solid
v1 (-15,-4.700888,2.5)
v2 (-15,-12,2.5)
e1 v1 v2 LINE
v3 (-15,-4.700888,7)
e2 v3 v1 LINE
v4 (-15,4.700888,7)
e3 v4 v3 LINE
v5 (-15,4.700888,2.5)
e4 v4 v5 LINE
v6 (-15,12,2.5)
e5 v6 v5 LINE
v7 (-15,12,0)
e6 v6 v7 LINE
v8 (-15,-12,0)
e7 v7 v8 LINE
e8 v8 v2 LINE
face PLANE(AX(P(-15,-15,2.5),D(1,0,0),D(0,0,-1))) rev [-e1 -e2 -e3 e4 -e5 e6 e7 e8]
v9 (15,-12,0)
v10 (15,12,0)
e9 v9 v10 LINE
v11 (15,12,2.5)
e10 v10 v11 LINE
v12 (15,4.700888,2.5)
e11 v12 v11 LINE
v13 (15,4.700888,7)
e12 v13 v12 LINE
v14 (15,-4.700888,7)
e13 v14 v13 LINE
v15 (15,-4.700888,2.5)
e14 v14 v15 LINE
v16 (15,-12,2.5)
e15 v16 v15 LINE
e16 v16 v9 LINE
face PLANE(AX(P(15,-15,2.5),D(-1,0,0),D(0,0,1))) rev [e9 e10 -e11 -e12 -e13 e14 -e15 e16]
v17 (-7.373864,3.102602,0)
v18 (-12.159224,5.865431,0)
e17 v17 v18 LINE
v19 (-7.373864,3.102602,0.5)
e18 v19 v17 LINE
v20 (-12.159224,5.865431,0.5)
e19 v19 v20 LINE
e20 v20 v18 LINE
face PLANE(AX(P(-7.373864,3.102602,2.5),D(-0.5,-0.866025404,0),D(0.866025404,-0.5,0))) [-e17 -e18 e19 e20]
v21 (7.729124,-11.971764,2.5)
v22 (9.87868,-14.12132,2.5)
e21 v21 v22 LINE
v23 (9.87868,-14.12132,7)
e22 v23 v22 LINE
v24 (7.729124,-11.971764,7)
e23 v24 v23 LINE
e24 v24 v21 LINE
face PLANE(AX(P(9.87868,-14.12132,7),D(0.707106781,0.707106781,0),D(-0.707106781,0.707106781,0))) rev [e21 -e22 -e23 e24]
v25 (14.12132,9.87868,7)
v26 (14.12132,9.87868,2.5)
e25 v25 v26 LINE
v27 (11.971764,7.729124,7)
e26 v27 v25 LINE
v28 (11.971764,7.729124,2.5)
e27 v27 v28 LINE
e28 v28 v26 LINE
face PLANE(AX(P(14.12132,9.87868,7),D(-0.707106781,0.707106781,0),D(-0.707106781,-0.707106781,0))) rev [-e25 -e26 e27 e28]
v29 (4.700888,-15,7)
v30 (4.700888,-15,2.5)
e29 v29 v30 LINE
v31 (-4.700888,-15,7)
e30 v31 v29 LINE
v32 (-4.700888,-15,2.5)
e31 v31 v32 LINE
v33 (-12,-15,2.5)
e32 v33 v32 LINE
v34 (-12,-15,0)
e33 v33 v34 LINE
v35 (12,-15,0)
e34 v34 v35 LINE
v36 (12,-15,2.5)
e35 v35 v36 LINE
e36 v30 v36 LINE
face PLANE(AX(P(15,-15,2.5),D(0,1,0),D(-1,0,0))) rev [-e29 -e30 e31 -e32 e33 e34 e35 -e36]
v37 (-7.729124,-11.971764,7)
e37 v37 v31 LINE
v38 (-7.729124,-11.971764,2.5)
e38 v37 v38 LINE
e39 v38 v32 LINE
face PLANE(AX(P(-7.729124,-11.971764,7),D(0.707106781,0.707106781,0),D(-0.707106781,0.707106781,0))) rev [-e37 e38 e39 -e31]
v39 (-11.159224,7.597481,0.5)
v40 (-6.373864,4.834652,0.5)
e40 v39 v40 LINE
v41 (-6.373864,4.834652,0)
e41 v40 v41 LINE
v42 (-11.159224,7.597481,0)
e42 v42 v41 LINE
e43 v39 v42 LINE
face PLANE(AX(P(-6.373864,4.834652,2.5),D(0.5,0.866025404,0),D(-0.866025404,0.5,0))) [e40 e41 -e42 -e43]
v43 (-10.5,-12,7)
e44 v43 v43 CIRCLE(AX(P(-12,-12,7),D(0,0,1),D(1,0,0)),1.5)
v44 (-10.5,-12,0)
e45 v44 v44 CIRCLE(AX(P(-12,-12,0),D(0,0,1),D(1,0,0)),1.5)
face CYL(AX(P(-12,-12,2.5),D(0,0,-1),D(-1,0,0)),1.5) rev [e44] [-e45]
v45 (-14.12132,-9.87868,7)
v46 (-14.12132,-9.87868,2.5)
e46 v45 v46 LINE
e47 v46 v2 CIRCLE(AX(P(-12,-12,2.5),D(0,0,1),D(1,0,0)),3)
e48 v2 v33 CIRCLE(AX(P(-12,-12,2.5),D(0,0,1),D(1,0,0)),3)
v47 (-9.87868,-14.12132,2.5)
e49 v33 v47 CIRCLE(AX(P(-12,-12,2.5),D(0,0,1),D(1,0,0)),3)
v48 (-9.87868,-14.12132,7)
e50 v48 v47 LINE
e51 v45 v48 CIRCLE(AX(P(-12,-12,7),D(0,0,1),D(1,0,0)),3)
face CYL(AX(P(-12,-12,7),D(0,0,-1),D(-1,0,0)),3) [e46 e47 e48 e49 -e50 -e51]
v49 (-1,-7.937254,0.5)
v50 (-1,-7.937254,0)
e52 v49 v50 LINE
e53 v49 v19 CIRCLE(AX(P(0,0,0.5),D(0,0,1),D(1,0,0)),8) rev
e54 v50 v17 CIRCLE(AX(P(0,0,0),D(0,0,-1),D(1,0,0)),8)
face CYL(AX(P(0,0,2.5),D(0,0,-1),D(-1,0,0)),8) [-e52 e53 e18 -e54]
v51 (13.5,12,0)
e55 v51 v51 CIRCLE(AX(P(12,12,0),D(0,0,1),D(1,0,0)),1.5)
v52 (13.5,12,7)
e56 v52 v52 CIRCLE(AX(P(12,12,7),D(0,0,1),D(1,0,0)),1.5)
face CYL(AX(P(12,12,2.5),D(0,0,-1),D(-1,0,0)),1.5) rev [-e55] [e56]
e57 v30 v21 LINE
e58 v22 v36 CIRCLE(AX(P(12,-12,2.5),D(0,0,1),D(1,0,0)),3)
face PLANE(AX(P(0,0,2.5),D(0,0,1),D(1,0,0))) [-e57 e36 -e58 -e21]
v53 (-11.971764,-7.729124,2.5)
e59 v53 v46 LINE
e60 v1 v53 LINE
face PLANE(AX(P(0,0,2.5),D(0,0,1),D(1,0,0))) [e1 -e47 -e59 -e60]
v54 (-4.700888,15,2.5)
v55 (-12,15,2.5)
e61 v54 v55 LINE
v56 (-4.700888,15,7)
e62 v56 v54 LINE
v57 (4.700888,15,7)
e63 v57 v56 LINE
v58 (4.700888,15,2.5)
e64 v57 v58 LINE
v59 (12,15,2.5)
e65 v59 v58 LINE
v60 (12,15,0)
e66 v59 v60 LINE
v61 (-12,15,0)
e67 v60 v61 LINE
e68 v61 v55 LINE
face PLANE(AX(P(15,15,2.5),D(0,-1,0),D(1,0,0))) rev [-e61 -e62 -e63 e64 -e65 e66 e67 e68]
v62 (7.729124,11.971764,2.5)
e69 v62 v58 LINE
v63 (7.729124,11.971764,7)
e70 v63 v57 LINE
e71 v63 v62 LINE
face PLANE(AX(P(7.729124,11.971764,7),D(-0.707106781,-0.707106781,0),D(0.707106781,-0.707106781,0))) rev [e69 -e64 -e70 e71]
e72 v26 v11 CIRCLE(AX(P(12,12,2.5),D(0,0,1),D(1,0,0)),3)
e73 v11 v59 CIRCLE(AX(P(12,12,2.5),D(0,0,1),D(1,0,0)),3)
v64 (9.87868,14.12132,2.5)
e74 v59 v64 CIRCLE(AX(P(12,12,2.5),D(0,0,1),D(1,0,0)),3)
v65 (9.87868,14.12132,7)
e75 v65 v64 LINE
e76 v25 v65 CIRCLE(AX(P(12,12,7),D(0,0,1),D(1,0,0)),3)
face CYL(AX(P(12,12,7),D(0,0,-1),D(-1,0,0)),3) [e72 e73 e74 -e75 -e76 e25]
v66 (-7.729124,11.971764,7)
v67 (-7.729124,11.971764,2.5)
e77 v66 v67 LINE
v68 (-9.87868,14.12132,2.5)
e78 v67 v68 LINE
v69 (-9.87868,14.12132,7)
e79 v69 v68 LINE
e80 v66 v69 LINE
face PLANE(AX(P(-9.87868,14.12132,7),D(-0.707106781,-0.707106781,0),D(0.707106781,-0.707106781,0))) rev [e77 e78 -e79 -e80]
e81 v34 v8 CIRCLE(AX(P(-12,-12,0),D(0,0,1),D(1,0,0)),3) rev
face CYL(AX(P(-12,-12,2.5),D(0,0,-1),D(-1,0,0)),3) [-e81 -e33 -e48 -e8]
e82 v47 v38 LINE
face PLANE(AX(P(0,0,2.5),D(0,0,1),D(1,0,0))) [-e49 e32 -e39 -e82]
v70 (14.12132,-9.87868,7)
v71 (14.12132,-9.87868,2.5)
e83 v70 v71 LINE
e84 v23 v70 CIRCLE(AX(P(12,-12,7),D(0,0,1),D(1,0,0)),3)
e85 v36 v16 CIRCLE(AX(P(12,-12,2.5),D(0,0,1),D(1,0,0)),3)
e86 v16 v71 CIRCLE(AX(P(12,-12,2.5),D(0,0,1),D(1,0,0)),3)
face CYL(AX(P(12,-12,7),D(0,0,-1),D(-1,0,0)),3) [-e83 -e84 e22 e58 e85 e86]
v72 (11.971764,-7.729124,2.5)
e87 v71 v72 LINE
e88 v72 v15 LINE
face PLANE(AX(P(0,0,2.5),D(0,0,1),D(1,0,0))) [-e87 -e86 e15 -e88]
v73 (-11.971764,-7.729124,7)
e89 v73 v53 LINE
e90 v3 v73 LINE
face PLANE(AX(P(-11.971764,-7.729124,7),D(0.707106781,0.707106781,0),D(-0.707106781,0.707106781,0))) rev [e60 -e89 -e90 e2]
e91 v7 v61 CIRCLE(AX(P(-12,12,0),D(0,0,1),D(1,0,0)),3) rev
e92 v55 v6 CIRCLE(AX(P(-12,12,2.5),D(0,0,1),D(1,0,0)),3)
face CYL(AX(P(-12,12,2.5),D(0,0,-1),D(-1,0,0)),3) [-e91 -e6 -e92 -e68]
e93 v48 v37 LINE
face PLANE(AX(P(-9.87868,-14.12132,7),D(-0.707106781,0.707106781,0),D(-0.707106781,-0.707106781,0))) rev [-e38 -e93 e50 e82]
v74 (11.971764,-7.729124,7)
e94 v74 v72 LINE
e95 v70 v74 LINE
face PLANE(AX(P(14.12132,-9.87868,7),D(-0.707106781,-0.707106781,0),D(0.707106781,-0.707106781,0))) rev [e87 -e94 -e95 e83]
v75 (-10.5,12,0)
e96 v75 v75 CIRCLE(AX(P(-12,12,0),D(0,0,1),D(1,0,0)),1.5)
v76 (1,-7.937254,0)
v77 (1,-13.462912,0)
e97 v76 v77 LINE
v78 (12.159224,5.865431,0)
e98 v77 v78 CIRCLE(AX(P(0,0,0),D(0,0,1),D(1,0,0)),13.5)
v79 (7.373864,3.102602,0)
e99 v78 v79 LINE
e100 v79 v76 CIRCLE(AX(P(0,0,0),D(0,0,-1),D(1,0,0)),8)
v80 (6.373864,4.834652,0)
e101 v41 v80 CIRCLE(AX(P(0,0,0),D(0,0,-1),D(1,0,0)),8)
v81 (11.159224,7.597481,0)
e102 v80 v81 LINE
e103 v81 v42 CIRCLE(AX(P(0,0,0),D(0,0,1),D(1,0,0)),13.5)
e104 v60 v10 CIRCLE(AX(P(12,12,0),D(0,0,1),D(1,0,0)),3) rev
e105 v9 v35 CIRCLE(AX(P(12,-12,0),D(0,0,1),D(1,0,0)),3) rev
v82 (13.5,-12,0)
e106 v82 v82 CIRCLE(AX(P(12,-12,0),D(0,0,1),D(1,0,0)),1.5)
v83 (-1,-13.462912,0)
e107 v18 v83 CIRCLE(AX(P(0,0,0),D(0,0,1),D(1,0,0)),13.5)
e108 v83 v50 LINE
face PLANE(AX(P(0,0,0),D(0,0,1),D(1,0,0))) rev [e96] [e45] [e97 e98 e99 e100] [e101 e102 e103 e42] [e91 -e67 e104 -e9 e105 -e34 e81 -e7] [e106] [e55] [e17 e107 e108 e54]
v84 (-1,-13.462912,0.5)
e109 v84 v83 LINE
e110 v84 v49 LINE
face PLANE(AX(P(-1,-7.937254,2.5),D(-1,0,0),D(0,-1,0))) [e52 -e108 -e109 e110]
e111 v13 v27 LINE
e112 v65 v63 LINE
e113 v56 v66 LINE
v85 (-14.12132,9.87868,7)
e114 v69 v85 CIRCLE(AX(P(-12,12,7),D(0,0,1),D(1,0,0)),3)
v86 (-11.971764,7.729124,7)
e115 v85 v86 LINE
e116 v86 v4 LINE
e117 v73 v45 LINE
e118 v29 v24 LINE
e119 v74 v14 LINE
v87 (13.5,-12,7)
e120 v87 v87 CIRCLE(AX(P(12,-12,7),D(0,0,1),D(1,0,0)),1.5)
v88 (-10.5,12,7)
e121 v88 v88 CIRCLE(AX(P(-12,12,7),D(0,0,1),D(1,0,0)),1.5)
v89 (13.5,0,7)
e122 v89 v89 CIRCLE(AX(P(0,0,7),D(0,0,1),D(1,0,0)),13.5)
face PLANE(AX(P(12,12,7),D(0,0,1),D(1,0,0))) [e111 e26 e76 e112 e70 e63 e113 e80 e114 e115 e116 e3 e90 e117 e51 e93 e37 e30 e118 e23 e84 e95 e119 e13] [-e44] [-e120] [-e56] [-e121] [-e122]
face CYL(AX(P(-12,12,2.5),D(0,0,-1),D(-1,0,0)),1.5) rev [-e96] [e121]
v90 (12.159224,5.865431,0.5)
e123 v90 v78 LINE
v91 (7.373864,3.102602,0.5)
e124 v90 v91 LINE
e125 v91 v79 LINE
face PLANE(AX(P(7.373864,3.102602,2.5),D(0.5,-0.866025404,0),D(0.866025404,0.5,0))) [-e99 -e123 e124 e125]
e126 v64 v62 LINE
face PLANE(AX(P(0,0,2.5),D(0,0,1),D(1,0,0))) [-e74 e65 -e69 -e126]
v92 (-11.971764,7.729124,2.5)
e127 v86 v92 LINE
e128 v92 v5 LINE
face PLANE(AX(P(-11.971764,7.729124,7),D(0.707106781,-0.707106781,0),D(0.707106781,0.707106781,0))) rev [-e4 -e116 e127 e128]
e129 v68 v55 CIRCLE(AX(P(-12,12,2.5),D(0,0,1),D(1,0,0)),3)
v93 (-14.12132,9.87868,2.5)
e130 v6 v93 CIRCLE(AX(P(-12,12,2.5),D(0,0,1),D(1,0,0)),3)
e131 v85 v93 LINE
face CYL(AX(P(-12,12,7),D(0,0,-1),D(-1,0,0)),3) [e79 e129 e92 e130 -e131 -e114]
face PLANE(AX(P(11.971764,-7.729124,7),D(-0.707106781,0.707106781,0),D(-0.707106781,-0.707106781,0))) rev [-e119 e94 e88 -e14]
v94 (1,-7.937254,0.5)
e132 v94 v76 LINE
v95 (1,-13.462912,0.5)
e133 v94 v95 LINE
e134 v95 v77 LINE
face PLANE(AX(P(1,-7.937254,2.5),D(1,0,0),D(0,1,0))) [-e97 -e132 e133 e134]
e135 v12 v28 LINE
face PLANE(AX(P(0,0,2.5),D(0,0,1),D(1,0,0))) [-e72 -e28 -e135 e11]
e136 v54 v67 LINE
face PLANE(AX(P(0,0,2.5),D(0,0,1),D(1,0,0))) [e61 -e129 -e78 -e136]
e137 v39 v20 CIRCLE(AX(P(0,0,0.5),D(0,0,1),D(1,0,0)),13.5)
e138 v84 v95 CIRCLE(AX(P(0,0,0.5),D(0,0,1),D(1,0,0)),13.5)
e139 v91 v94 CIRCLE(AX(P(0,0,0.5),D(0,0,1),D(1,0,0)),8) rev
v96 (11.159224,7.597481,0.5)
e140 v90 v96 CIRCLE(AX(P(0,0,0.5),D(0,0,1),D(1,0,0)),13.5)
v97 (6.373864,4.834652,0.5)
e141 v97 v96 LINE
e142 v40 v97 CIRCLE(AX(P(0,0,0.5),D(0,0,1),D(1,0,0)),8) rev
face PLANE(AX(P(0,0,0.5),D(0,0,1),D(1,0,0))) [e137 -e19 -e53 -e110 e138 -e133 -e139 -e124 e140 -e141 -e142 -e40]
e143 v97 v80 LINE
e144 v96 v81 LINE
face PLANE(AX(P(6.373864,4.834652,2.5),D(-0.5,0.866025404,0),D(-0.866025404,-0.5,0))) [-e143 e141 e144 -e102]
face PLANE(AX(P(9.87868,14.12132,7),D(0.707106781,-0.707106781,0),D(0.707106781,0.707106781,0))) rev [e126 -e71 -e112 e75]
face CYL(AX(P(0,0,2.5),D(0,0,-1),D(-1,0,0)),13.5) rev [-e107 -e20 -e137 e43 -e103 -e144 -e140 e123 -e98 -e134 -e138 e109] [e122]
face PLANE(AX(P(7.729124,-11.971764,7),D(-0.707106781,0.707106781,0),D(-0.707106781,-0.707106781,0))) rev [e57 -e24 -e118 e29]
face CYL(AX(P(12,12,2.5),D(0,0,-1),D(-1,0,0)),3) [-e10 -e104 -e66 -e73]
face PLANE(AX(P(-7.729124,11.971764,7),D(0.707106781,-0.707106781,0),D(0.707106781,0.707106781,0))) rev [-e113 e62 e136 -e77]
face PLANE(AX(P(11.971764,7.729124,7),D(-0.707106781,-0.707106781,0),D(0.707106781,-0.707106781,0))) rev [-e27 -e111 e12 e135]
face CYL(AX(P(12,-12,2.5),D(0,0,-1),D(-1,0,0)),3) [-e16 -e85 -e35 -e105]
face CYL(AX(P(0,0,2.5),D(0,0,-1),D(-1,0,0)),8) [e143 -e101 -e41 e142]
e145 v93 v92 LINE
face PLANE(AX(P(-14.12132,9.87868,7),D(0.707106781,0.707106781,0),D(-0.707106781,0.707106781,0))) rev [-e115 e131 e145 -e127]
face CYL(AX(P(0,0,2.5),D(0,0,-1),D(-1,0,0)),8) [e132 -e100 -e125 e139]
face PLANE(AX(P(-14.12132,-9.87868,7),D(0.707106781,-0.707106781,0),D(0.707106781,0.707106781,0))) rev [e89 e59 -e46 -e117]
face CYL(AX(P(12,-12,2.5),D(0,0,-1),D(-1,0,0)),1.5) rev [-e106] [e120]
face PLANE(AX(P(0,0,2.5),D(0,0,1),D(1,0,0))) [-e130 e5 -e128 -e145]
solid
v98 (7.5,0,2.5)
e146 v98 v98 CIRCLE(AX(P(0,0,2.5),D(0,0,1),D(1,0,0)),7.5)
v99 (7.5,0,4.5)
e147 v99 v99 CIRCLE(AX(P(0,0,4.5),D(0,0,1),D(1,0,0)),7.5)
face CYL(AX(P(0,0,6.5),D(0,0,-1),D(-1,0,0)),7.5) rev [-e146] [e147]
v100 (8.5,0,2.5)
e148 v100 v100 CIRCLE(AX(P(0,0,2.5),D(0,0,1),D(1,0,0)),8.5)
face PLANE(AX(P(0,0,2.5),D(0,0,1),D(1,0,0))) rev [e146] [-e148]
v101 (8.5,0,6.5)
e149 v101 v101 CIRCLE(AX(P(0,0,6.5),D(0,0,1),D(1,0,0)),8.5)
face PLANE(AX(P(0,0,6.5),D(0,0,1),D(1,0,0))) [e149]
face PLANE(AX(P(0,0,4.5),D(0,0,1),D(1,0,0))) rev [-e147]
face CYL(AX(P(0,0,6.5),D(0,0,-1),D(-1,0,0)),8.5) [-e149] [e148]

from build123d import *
from build123d.topology import SkipClean

# Parameters (mm, degrees)
SKETCH_1_W          = 30
SKETCH_1_H          = 30
SKETCH_1_R          = 1.5
EXTRUDE_1_DEPTH     = 2.5
SKETCH_2_R          = 1.5
SKETCH_2_R_2        = 13.5
EXTRUDE_2_DEPTH     = 4.5
FILLET_2_R          = 3
CUT_EXTRUDE_START   = -2
SKETCH_3_R          = 13.5
CUT_EXTRUDE_1_DEPTH = 2
SKETCH_4_R          = 8.5
SKETCH_4_R_2        = 7.5
EXTRUDE_3_DEPTH     = 4
SKETCH_5_R          = 8.5
EXTRUDE_4_DEPTH     = 2


with BuildPart() as part:
    # Эскиз1 → Бобышка-Вытянуть1 (new body)
    with BuildSketch(Plane.XY):
        Rectangle(SKETCH_1_W, SKETCH_1_H)
        with Locations((-12, 12)):
            Circle(SKETCH_1_R, mode=Mode.SUBTRACT)
        with Locations((12, 12)):
            Circle(SKETCH_1_R, mode=Mode.SUBTRACT)
        with Locations((12, -12)):
            Circle(SKETCH_1_R, mode=Mode.SUBTRACT)
        with Locations((-12, -12)):
            Circle(SKETCH_1_R, mode=Mode.SUBTRACT)
        with BuildLine():
            Line((-1, -7.937253933), (-1, -13.462912018))
            ThreePointArc((-1, -13.462912018), (-11.691342951, -6.75), (-12.159223816, 5.865430605))
            Line((-12.159223816, 5.865430605), (-7.373863542, 3.102601563))
            ThreePointArc((-7.373863542, 3.102601563), (-6.92820323, -4), (-1, -7.937253933))
        make_face(mode=Mode.SUBTRACT)
        with BuildLine():
            Line((1, -7.937253933), (1, -13.462912018))
            ThreePointArc((1, -13.462912018), (11.691342951, -6.75), (12.159223816, 5.865430605))
            Line((12.159223816, 5.865430605), (7.373863542, 3.102601563))
            ThreePointArc((7.373863542, 3.102601563), (6.92820323, -4), (1, -7.937253933))
        make_face(mode=Mode.SUBTRACT)
        with BuildLine():
            Line((-6.373863542, 4.83465237), (-11.159223816, 7.597481413))
            ThreePointArc((-11.159223816, 7.597481413), (0, 13.5), (11.159223816, 7.597481413))
            Line((11.159223816, 7.597481413), (6.373863542, 4.83465237))
            ThreePointArc((6.373863542, 4.83465237), (0, 8), (-6.373863542, 4.83465237))
        make_face(mode=Mode.SUBTRACT)
    extrude(amount=EXTRUDE_1_DEPTH)

    # Эскиз2 → Бобышка-Вытянуть2 (add)
    with SkipClean():  # the faces are left unmerged after this step: merging them gives an invalid solid
        with BuildSketch(Plane.XY.offset(2.5)):
            with BuildLine():
                Line((-9.878679656, 14.121320344), (-7.729123809, 11.971764496))
                Line((-7.729123809, 11.971764496), (-4.700888305, 15))
                Line((-4.700888305, 15), (4.700888305, 15))
                Line((4.700888305, 15), (7.729123809, 11.971764496))
                Line((7.729123809, 11.971764496), (9.878679656, 14.121320344))
                ThreePointArc((9.878679656, 14.121320344), (14.121320344, 14.121320344), (14.121320344, 9.878679656))
                Line((14.121320344, 9.878679656), (11.971764496, 7.729123809))
                Line((11.971764496, 7.729123809), (15, 4.700888305))
                Line((15, 4.700888305), (15, -4.700888305))
                Line((15, -4.700888305), (11.971764496, -7.729123809))
                Line((11.971764496, -7.729123809), (14.121320344, -9.878679656))
                ThreePointArc((14.121320344, -9.878679656), (14.121320344, -14.121320344), (9.878679656, -14.121320344))
                Line((9.878679656, -14.121320344), (7.729123809, -11.971764496))
                Line((7.729123809, -11.971764496), (4.700888305, -15))
                Line((4.700888305, -15), (-4.700888305, -15))
                Line((-4.700888305, -15), (-7.729123809, -11.971764496))
                Line((-7.729123809, -11.971764496), (-9.878679656, -14.121320344))
                ThreePointArc((-9.878679656, -14.121320344), (-14.121320344, -14.121320344), (-14.121320344, -9.878679656))
                Line((-14.121320344, -9.878679656), (-11.971764496, -7.729123809))
                Line((-11.971764496, -7.729123809), (-15, -4.700888305))
                Line((-15, -4.700888305), (-15, 4.700888305))
                Line((-15, 4.700888305), (-11.971764496, 7.729123809))
                Line((-11.971764496, 7.729123809), (-14.121320344, 9.878679656))
                ThreePointArc((-14.121320344, 9.878679656), (-14.121320344, 14.121320344), (-9.878679656, 14.121320344))
            make_face()
            with Locations((-12, 12)):
                Circle(SKETCH_2_R, mode=Mode.SUBTRACT)
            with Locations((12, 12)):
                Circle(SKETCH_2_R, mode=Mode.SUBTRACT)
            with Locations((12, -12)):
                Circle(SKETCH_2_R, mode=Mode.SUBTRACT)
            with Locations((-12, -12)):
                Circle(SKETCH_2_R, mode=Mode.SUBTRACT)
            with Locations(Location((0, 0, 0), (0, 0, 154.248022667))):
                Circle(SKETCH_2_R_2, mode=Mode.SUBTRACT)
        extrude(amount=EXTRUDE_2_DEPTH)

    # Скругление2
    fillet_2_edges = [part.edges().sort_by_distance(p)[0] for p in [
        (-15, -15, 1.25),
        (15, -15, 1.25),
        (15, 15, 1.25),
        (-15, 15, 1.25),
    ]]
    fillet(fillet_2_edges, radius=FILLET_2_R - 0.0001)  # a hair under: the kernel refuses the full size

    # Эскиз3 → Вырез-Вытянуть1 (cut)
    with BuildSketch(Plane.XY.offset(2.5).offset(CUT_EXTRUDE_START)):
        with Locations(Location((0, 0, 0), (0, 0, 154.248022667))):
            Circle(SKETCH_3_R)
    extrude(amount=CUT_EXTRUDE_1_DEPTH, mode=Mode.SUBTRACT)


with BuildPart() as body_2:
    # Эскиз4 → Бобышка-Вытянуть3 (new body)
    with BuildSketch(Plane.XY.offset(2.5)):
        Circle(SKETCH_4_R)
        Circle(SKETCH_4_R_2, mode=Mode.SUBTRACT)
    extrude(amount=EXTRUDE_3_DEPTH)

    # Эскиз5 → Бобышка-Вытянуть4 (add)
    with BuildSketch(Plane.XY.offset(6.5)):
        Circle(SKETCH_5_R)
    extrude(amount=-EXTRUDE_4_DEPTH)


solid = Compound([part.part, body_2.part])
